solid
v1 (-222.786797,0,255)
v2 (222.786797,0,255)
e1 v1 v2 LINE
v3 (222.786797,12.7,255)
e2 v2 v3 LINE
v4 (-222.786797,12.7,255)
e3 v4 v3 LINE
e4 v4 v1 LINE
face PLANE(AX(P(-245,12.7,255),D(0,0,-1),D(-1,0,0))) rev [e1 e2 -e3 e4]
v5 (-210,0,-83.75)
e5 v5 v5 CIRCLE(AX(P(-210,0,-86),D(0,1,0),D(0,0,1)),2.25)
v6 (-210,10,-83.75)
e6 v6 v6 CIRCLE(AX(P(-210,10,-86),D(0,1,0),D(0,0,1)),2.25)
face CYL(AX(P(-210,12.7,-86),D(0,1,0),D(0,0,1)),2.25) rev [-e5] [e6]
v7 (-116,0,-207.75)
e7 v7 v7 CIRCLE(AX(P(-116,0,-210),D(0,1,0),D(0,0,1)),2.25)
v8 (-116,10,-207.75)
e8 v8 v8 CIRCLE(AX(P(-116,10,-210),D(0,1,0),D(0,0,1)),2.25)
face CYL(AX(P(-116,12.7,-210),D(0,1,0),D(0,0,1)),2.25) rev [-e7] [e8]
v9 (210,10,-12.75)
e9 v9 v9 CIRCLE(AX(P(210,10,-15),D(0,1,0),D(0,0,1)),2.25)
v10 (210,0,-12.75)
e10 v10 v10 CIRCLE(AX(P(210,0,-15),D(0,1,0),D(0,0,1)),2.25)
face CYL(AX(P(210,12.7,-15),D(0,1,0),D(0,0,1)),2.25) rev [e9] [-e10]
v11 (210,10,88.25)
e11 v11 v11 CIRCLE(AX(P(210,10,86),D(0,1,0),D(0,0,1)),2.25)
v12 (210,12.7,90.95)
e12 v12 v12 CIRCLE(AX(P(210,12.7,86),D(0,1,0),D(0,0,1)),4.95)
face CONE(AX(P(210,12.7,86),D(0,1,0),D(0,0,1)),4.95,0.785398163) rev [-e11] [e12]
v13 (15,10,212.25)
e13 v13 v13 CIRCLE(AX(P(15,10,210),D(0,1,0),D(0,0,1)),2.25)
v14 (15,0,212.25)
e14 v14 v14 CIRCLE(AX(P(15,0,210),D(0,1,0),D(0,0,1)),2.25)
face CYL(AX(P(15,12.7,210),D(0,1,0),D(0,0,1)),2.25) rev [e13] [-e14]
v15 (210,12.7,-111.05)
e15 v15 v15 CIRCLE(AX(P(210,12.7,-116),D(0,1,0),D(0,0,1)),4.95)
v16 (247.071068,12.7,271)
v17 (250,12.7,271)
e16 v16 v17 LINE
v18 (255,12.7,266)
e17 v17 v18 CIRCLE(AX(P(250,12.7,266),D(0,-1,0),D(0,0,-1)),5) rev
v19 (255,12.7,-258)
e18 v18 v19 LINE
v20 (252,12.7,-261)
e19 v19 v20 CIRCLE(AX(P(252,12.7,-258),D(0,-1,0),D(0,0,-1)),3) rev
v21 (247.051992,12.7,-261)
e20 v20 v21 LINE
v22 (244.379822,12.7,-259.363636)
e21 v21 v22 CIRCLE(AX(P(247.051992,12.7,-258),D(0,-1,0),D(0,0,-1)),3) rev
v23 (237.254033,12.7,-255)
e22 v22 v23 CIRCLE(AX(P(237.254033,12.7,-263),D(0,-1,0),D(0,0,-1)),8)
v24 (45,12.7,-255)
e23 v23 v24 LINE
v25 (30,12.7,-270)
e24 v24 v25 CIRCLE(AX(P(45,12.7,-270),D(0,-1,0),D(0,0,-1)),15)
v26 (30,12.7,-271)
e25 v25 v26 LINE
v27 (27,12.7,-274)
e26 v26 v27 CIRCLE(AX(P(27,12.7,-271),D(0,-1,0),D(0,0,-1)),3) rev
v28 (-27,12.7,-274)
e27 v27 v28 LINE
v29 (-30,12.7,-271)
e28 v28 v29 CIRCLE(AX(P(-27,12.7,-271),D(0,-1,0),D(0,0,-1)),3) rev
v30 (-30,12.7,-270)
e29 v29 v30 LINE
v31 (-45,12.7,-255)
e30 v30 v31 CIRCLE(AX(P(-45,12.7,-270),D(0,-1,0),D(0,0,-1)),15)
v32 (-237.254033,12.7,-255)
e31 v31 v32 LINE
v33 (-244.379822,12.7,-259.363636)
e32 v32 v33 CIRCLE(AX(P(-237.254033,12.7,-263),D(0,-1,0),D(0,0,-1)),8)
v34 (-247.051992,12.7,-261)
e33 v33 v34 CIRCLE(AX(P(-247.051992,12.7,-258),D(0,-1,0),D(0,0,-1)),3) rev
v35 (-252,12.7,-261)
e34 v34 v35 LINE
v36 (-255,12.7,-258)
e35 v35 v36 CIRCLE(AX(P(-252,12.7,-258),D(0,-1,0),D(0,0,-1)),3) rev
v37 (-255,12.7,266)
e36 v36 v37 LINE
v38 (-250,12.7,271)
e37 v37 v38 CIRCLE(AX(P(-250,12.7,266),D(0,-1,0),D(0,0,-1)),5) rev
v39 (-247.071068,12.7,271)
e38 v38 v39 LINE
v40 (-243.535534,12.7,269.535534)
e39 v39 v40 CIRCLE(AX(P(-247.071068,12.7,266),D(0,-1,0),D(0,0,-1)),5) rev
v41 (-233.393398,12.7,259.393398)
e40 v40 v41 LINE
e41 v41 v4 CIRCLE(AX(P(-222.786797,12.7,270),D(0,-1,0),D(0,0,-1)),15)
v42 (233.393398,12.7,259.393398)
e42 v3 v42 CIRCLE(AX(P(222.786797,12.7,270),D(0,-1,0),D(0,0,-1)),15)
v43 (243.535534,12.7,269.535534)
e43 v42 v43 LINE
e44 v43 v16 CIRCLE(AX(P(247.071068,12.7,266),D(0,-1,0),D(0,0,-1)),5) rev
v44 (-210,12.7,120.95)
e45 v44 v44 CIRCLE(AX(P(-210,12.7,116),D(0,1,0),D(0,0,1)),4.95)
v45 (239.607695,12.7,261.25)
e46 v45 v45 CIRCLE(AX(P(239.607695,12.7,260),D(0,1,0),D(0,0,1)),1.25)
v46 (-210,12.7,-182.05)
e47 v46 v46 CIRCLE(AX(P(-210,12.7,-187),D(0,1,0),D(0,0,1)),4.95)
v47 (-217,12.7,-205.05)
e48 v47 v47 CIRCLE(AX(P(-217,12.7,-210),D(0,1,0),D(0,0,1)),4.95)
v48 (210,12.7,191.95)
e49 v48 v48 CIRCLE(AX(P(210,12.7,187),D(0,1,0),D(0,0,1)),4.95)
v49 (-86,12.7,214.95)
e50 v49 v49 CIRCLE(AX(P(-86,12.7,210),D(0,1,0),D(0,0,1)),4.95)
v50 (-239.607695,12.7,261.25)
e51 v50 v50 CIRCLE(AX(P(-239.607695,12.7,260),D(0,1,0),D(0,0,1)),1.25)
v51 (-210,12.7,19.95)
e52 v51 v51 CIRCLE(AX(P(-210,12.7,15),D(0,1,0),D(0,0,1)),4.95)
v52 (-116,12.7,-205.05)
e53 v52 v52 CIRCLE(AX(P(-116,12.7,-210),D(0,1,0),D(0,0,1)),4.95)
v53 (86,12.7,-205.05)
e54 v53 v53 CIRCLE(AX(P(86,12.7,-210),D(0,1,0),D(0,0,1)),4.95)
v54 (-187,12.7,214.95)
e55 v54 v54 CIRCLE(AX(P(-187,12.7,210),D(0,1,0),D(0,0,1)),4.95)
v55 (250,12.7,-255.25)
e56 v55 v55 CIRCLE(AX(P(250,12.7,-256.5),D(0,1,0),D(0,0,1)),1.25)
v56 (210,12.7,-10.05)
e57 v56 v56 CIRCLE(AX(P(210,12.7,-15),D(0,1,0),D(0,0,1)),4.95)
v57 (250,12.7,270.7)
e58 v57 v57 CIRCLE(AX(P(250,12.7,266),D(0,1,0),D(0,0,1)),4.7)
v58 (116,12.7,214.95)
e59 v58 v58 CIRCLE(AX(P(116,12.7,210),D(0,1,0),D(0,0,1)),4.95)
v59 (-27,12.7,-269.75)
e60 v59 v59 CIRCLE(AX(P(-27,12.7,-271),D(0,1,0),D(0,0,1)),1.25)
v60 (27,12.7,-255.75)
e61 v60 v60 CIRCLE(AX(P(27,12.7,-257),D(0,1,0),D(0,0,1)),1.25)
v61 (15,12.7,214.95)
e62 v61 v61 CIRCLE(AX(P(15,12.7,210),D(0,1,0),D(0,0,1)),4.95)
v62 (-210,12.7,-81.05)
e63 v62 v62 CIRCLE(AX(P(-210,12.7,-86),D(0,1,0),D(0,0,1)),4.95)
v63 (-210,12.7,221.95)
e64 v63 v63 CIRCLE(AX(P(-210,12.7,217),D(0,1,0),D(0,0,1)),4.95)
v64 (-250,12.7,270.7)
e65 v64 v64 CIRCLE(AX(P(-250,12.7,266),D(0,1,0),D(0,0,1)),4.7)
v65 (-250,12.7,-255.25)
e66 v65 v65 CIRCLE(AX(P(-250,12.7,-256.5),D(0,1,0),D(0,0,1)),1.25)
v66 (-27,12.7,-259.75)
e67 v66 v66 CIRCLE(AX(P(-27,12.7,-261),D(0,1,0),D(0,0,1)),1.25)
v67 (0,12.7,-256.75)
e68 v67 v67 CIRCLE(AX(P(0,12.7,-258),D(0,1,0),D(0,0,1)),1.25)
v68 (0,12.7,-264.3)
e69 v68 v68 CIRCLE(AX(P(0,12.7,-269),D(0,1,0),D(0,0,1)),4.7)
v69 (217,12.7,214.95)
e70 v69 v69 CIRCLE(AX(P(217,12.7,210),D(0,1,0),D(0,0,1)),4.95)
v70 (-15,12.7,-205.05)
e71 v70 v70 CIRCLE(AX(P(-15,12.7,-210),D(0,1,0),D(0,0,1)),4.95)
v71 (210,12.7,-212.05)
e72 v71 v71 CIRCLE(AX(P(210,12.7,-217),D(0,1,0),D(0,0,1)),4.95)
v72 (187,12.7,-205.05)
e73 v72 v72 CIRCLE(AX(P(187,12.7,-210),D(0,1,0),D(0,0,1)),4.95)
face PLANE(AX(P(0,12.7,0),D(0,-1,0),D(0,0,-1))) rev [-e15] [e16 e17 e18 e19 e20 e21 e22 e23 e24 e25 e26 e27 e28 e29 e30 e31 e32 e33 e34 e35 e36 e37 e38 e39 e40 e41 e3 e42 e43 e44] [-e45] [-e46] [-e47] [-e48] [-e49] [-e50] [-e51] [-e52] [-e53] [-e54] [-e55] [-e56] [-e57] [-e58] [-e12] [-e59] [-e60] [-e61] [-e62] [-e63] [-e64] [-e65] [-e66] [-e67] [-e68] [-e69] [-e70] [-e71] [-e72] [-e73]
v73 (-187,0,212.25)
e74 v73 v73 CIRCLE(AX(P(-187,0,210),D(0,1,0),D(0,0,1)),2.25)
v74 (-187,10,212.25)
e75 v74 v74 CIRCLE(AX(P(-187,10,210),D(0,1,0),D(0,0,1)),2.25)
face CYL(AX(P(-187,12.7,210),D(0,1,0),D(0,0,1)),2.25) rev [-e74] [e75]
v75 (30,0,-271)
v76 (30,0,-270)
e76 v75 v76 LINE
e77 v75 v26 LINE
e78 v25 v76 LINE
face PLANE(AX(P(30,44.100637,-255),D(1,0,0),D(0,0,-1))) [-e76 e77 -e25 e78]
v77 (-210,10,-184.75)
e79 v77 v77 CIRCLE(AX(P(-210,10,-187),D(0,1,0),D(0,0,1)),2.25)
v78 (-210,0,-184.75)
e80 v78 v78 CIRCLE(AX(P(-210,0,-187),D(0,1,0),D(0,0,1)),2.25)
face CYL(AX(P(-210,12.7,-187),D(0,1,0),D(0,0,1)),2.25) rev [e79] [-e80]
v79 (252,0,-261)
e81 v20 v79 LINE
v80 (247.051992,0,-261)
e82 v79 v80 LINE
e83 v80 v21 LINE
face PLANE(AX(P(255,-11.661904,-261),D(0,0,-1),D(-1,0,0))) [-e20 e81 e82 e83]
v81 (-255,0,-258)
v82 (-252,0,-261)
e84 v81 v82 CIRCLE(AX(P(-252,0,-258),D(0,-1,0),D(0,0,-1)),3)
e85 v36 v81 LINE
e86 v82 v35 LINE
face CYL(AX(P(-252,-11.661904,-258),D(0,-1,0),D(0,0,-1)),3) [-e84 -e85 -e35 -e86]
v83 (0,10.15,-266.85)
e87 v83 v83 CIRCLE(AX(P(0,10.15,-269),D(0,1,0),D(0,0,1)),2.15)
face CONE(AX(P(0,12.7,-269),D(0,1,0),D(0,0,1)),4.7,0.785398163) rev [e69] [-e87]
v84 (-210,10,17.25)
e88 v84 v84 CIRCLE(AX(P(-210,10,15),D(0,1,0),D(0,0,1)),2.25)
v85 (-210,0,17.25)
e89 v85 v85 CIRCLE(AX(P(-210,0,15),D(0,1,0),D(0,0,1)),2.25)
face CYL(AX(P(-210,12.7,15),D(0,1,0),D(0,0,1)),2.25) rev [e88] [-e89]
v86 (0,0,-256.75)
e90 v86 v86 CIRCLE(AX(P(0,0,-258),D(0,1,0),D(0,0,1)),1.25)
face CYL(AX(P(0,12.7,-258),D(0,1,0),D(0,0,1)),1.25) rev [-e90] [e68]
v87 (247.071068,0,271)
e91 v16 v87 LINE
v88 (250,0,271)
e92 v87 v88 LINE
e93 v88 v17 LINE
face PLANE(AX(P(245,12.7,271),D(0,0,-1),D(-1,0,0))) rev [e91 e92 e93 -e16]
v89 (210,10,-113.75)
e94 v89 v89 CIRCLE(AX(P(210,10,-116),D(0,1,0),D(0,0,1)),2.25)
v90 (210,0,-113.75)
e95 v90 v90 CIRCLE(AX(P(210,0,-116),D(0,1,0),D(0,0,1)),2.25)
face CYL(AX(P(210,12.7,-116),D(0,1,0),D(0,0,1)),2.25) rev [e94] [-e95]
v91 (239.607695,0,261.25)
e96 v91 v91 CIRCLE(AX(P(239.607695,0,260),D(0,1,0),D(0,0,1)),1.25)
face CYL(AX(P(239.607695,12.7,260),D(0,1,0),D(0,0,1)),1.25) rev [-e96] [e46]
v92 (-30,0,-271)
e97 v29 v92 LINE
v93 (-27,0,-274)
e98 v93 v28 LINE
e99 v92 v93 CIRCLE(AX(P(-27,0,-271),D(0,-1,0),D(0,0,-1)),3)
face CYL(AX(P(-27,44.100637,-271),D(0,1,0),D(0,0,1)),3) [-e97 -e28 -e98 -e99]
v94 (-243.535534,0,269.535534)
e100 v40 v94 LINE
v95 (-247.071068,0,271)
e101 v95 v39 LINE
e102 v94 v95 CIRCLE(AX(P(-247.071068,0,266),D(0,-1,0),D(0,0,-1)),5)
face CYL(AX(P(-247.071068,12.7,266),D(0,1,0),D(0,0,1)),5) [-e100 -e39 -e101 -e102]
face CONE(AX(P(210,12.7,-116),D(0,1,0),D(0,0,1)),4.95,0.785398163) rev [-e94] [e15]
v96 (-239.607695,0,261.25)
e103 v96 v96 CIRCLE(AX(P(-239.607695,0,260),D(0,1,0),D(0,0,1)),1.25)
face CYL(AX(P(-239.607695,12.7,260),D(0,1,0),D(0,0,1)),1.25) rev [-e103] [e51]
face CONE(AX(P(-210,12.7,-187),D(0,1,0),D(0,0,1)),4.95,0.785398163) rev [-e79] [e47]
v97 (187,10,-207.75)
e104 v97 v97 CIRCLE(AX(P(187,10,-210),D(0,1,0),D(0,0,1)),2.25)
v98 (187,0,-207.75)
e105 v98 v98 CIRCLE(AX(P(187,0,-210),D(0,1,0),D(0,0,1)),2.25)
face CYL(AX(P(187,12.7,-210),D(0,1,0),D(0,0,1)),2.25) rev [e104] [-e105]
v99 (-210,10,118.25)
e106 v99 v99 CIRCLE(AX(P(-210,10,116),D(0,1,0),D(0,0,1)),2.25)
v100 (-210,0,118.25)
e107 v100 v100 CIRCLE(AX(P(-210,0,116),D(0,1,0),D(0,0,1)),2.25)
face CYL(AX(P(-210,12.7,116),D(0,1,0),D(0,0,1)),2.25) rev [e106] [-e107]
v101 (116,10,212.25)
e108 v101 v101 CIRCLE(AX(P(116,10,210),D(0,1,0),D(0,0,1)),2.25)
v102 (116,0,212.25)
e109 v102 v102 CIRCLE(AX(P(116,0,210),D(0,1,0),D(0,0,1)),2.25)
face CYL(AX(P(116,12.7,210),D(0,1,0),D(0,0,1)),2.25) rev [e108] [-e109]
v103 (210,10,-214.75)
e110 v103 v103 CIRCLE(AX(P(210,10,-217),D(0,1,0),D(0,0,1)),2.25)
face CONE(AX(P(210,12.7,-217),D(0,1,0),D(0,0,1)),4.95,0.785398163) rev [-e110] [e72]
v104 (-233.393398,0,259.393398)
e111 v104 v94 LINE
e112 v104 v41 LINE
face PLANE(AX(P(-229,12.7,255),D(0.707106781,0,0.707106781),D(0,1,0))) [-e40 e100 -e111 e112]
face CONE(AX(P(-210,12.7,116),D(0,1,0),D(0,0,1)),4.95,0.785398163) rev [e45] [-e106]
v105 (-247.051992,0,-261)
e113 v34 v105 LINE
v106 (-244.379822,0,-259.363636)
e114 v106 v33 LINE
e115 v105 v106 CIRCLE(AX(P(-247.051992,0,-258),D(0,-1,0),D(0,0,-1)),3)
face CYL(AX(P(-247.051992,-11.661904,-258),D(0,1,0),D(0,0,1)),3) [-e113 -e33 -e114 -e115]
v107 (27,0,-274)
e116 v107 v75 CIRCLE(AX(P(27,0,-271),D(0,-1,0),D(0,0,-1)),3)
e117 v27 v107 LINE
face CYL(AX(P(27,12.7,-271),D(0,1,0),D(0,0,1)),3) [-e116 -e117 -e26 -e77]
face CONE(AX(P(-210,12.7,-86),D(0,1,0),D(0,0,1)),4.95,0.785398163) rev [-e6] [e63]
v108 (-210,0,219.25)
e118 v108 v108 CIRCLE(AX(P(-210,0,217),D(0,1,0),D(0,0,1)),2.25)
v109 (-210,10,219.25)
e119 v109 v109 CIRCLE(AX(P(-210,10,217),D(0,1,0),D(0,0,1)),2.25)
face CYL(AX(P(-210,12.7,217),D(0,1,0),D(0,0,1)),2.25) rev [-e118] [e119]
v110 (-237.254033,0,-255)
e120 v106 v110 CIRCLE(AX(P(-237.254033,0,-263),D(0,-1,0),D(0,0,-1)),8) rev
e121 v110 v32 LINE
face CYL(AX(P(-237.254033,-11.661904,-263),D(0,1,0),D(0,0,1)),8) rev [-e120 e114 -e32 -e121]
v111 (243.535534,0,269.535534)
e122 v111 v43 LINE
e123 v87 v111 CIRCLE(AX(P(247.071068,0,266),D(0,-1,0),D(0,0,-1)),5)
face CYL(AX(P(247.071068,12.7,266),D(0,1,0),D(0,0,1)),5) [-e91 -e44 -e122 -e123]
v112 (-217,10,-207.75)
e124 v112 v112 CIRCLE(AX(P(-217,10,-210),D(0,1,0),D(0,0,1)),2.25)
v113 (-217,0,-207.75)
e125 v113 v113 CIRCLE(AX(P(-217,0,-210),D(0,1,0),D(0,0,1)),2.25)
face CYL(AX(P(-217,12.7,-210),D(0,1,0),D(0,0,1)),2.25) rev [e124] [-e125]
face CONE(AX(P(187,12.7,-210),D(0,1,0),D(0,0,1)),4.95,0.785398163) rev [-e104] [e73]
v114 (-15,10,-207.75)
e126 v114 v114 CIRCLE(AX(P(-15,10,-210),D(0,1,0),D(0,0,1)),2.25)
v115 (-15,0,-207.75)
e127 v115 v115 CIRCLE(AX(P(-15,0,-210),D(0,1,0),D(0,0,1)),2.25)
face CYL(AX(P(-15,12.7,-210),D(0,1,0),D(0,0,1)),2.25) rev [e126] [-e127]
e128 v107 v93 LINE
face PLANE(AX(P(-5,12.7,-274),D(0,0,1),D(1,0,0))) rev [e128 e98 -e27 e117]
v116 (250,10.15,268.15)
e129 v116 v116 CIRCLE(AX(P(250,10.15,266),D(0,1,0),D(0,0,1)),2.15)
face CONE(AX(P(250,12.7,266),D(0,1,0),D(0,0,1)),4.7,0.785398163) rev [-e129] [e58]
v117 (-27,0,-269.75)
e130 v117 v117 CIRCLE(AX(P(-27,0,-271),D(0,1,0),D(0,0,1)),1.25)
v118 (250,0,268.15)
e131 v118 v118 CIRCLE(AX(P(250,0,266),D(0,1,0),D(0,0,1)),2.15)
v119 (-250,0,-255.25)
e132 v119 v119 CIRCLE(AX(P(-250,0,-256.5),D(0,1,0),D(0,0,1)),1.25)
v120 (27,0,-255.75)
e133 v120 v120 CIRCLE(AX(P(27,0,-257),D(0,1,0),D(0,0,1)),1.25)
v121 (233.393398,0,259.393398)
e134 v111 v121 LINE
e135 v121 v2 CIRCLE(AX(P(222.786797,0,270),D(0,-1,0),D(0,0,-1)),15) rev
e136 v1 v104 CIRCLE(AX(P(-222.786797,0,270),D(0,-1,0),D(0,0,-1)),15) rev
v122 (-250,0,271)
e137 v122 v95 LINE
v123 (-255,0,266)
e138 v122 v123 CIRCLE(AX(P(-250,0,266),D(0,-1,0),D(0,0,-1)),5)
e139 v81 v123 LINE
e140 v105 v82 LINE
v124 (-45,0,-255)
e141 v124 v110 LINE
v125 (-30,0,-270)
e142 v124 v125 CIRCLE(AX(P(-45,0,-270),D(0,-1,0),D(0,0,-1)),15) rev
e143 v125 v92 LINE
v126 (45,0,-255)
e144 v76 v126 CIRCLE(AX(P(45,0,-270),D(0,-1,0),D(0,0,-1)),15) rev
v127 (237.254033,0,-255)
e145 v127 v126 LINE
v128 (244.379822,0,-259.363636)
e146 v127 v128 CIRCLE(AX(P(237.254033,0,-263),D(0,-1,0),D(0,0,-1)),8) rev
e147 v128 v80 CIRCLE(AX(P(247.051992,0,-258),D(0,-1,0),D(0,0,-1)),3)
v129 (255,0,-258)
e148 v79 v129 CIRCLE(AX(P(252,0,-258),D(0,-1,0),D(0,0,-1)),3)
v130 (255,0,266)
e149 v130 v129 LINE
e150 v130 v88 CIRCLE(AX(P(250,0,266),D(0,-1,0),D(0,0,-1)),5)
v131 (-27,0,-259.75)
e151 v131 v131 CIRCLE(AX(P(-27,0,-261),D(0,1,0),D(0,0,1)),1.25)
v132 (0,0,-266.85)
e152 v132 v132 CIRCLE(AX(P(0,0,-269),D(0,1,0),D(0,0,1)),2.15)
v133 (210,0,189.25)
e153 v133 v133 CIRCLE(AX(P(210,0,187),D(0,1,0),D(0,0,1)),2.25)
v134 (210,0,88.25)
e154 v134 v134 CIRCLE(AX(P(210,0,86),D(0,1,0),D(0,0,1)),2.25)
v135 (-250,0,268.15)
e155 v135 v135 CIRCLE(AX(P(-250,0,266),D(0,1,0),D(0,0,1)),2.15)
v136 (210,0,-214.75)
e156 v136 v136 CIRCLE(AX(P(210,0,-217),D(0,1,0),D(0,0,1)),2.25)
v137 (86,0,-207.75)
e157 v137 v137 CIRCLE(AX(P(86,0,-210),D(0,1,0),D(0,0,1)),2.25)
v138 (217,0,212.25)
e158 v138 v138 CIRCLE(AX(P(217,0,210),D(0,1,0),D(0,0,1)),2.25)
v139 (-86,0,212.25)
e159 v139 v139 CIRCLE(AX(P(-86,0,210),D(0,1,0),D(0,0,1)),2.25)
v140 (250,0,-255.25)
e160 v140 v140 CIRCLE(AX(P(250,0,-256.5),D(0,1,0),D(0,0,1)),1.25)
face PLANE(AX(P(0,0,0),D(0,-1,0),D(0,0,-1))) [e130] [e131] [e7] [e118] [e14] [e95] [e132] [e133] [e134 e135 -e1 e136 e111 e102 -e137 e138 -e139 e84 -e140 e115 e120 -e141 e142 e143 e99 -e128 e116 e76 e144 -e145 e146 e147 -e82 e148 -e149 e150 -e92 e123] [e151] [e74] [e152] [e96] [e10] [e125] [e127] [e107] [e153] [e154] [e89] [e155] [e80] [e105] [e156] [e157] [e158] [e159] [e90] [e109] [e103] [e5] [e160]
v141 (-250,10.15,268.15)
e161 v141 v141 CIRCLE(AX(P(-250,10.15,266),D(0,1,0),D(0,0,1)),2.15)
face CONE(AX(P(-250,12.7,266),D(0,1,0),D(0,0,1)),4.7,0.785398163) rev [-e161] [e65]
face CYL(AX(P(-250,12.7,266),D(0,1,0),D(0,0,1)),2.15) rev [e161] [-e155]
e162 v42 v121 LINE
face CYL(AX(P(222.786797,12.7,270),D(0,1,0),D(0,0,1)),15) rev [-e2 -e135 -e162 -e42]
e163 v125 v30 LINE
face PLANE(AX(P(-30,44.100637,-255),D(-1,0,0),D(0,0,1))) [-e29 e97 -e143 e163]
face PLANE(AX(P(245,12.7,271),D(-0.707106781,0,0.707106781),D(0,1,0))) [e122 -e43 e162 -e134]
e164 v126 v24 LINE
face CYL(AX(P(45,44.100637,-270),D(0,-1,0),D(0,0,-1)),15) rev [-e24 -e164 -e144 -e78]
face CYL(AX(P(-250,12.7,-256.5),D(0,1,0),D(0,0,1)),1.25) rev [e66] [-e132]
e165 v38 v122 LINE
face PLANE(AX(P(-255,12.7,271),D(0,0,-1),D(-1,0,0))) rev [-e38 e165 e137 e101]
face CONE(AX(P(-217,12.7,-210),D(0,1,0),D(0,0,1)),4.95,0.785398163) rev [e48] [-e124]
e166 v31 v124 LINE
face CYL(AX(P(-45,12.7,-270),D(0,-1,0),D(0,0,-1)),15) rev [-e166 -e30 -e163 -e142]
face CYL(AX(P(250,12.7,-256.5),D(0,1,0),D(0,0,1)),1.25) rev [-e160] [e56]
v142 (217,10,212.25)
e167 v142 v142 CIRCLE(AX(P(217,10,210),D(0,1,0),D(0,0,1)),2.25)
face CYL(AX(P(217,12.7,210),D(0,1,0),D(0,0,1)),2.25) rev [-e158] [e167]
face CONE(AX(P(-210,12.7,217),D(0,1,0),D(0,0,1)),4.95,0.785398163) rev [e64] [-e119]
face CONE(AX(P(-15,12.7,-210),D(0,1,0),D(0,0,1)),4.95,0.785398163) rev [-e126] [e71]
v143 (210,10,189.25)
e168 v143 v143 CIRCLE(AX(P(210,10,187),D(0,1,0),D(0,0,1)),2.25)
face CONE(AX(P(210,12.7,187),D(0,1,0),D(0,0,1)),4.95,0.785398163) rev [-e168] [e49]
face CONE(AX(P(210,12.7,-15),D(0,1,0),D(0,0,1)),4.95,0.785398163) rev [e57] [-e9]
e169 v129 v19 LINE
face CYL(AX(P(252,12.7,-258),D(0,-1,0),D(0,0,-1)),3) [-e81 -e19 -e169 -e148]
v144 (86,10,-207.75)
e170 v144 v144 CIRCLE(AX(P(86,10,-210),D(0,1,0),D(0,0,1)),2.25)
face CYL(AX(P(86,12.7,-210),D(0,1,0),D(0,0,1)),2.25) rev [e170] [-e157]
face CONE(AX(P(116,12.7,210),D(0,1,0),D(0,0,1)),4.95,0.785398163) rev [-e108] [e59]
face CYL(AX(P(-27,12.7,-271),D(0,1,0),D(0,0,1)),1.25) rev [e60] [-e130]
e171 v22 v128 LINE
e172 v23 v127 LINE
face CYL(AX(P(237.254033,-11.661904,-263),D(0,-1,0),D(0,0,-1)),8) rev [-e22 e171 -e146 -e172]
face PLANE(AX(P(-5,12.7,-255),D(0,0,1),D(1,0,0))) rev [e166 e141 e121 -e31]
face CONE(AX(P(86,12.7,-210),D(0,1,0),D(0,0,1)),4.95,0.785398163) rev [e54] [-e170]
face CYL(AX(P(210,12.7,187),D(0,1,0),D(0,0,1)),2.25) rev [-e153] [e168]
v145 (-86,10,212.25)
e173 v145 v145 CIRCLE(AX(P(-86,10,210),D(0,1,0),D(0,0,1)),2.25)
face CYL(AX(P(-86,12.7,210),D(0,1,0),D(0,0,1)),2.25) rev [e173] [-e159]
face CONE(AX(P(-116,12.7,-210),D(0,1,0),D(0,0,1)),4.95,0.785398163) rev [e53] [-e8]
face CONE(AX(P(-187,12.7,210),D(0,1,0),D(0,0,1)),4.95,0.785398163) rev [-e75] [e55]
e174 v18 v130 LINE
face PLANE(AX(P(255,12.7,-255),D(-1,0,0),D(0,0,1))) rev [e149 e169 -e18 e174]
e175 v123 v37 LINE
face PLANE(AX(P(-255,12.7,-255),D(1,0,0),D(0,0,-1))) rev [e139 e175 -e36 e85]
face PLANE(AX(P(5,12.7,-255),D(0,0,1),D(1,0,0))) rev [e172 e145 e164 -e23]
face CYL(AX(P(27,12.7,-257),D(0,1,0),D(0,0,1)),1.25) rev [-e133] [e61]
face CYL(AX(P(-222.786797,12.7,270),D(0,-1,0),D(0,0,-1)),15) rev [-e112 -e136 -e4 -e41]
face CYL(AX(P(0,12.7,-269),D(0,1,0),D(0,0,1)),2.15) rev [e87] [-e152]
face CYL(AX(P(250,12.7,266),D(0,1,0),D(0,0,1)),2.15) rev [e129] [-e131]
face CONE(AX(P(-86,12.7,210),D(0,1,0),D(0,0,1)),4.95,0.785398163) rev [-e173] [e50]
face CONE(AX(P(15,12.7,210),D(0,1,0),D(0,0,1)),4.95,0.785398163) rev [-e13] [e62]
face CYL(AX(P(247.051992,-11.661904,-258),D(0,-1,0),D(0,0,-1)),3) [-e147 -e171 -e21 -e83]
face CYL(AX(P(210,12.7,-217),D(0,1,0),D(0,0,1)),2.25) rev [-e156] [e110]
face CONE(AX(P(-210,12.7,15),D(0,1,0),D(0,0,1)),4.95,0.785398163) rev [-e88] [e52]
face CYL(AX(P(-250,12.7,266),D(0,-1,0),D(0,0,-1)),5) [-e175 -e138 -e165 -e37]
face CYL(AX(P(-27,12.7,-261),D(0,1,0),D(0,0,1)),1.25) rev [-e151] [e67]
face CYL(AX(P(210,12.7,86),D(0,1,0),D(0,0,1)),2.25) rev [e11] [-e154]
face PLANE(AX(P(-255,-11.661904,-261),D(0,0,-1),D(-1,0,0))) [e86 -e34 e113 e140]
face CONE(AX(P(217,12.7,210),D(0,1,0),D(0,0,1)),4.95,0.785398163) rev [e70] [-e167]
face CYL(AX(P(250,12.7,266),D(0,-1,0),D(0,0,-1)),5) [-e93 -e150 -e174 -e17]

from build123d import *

# Parameters (mm, degrees)
BOSS_EXTRUDE1_DEPTH                             = 12.7
CSK_FOR_M4_FLAT_HEAD_MACHINE_SCREW1_D           = 4.3
CSK_FOR_M4_FLAT_HEAD_MACHINE_SCREW1_CSINK_D     = 9.4
CSK_FOR_M4_FLAT_HEAD_MACHINE_SCREW1_CSINK_ANGLE = 90
CHAMFER1_SIZE                                   = 16
SKETCH6_W                                       = 10
SKETCH6_H                                       = 6
BOSS_EXTRUDE2_DEPTH                             = 12.7
FILLET5_R                                       = 8
M3X0_5_TAPPED_HOLE1_D                           = 2.5
FILLET6_START                                   = -1
FILLET6_DEPTH                                   = 15
SKETCH18_W                                      = 25
SKETCH18_H                                      = 19
BOSS_EXTRUDE4_DEPTH                             = 12.7
FILLET11_R                                      = 15
FILLET12_R                                      = 3
M3X0_5_TAPPED_HOLE2_D                           = 2.5
CSK_FOR_M4_FLAT_HEAD_MACHINE_SCREW2_D           = 4.5
CSK_FOR_M4_FLAT_HEAD_MACHINE_SCREW2_CSINK_D     = 9.9
CSK_FOR_M4_FLAT_HEAD_MACHINE_SCREW2_CSINK_ANGLE = 90


with BuildPart() as part:
    # Sketch1 → Boss-Extrude1 (new body)
    with BuildSketch(Plane(origin=(0, 0, 0), x_dir=(1, 0, 0), z_dir=(0, 1, 0))):
        Polygon((-5, 274), (5, 274), (5, 255), (255, 255), (255, -271), (245, -271), (245, -255), (-245, -255), (-245, -271), (-255, -271), (-255, 255), (-5, 255), align=None)
    extrude(amount=BOSS_EXTRUDE1_DEPTH)

    # CSK for M4 Flat Head Machine Screw1 (through all)
    with Locations(Plane(origin=(0, 12.7, 0), x_dir=(1, 0, 0), z_dir=(0, 1, 0))):
        with Locations((0, 269), (-250, -266), (250, -266)):
            CounterSinkHole(CSK_FOR_M4_FLAT_HEAD_MACHINE_SCREW1_D / 2, CSK_FOR_M4_FLAT_HEAD_MACHINE_SCREW1_CSINK_D / 2, counter_sink_angle=CSK_FOR_M4_FLAT_HEAD_MACHINE_SCREW1_CSINK_ANGLE)

    # Chamfer1
    chamfer1_edges = [part.edges().sort_by_distance(p)[0] for p in [
        (245, 6.35, 255),
        (-245, 6.35, 255),
    ]]
    chamfer(chamfer1_edges, length=CHAMFER1_SIZE - 0.0001)  # a hair under: the kernel refuses the full size

    # Sketch6 → Boss-Extrude2 (add)
    with BuildSketch(Plane(origin=(0, 12.7, 0), x_dir=(1, 0, 0), z_dir=(0, 1, 0))):
        with Locations((-250, 258)):
            Rectangle(SKETCH6_W, SKETCH6_H)
        with Locations((250, 258)):
            Rectangle(SKETCH6_W, SKETCH6_H)
    extrude(amount=-BOSS_EXTRUDE2_DEPTH)

    # Fillet5
    # the kernel refuses this fillet: 8 mm, written as the material it adds along each edge
    with BuildSketch(Plane(origin=(245, 12.7, -255), x_dir=(0, 0, -1), z_dir=(0, -1, 0))) as fillet5_piece_1:
        with BuildLine():
            CenterArc((8, -7.745966692), FILLET5_R, 104.477512186, 75.522487814)
            Line((0, -7.745966692), (-0.16, -7.745966692))
            Line((-0.16, -7.745966692), (-0.16, 0))
            Line((-0.16, 0), (0, 0.16))
            ThreePointArc((0, 0.16), (3, 0.16), (5.96, 0.154919334))
            Line((5.96, 0.154919334), (6, 0))
        make_face()
    extrude(amount=12.7)
    with BuildSketch(Plane(origin=(-245, 12.7, -255), x_dir=(1, 0, 0), z_dir=(0, -1, 0))) as fillet5_piece_2:
        with BuildLine():
            CenterArc((7.745966692, -8), FILLET5_R, 90, 75.522487814)
            Line((0, -6), (-0.154919334, -5.96))
            ThreePointArc((-0.154919334, -5.96), (-0.16, -3), (-0.16, 0))
            Line((-0.16, 0), (0, 0.16))
            Line((0, 0.16), (7.745966692, 0.16))
            Line((7.745966692, 0.16), (7.745966692, 0))
        make_face()
    extrude(amount=12.7)

    # M3x0.5 Tapped Hole1 (through all)
    with Locations(Plane(origin=(0, 12.7, 0), x_dir=(1, 0, 0), z_dir=(0, 1, 0))):
        with Locations((-250, 256.5), (250, 256.5), (239.607695155, -260), (-239.607695155, -260), (0, 258)):
            Hole(M3X0_5_TAPPED_HOLE1_D / 2)

    # Fillet6: read off the stored shape, not the designer's step
    # Fillet6 outline → Fillet6 (cut)
    with BuildSketch(Plane(origin=(0, 0, 0), x_dir=(1, 0, 0), z_dir=(0, 1, 0)).offset(FILLET6_START)):
        with BuildLine():
            ThreePointArc((255, -266), (253.535533906, -269.535533906), (250, -271))
            Line((250, -271), (255, -271))
            Line((255, -271), (255, -266))
        make_face()
        with BuildLine():
            ThreePointArc((247.071067812, -271), (245.15765065, -270.619397663), (243.535533906, -269.535533906))
            Line((243.535533906, -269.535533906), (245, -271))
            Line((245, -271), (247.071067812, -271))
        make_face()
        with BuildLine():
            ThreePointArc((-243.535533906, -269.535533906), (-245.15765065, -270.619397663), (-247.071067812, -271))
            Line((-247.071067812, -271), (-245, -271))
            Line((-245, -271), (-243.535533906, -269.535533906))
        make_face()
        with BuildLine():
            Line((-255, -271), (-250, -271))
            ThreePointArc((-250, -271), (-253.535533906, -269.535533906), (-255, -266))
            Line((-255, -266), (-255, -271))
        make_face()
    extrude(amount=FILLET6_DEPTH, mode=Mode.SUBTRACT)

    # Sketch18 → Boss-Extrude4 (add)
    with BuildSketch(Plane.XZ):
        with Locations((17.5, -264.5)):
            Rectangle(SKETCH18_W, SKETCH18_H)
        with Locations((-17.5, -264.5)):
            Rectangle(SKETCH18_W, SKETCH18_H)
    extrude(amount=-BOSS_EXTRUDE4_DEPTH)

    # Fillet11
    fillet11_edges = [part.edges().sort_by_distance(p)[0] for p in [
        (30, 6.35, -255),
        (-30, 6.35, -255),
        (-229.0001, 6.35, 255),
        (229.0001, 6.35, 255),
    ]]
    fillet(fillet11_edges, radius=FILLET11_R)

    # Fillet12
    fillet12_edges = [part.edges().sort_by_distance(p)[0] for p in [
        (30, 6.35, -274),
        (-30, 6.35, -274),
        (-245, 6.35, -261),
        (-255, 6.35, -261),
        (245, 6.35, -261),
        (255, 6.35, -261),
    ]]
    fillet(fillet12_edges, radius=FILLET12_R)

    # M3x0.5 Tapped Hole2 (through all)
    with Locations(Plane(origin=(0, 12.7, 0), x_dir=(1, 0, 0), z_dir=(0, 1, 0))):
        with Locations((27, 257), (-27, 271), (-27, 261)):
            Hole(M3X0_5_TAPPED_HOLE2_D / 2)

    # CSK for M4 Flat Head Machine Screw2 (through all)
    with Locations(Plane(origin=(0, 12.7, 0), x_dir=(1, 0, 0), z_dir=(0, 1, 0))):
        with Locations((-210, -217), (-187, -210), (-86, -210), (-210, -116), (-210, -15), (-210, 86), (-210, 187), (-217, 210), (-116, 210), (-15, 210), (86, 210), (187, 210), (210, 217), (210, 116), (210, 15), (210, -86), (210, -187), (217, -210), (116, -210), (15, -210)):
            CounterSinkHole(CSK_FOR_M4_FLAT_HEAD_MACHINE_SCREW2_D / 2, CSK_FOR_M4_FLAT_HEAD_MACHINE_SCREW2_CSINK_D / 2, counter_sink_angle=CSK_FOR_M4_FLAT_HEAD_MACHINE_SCREW2_CSINK_ANGLE)


solid = part.part
